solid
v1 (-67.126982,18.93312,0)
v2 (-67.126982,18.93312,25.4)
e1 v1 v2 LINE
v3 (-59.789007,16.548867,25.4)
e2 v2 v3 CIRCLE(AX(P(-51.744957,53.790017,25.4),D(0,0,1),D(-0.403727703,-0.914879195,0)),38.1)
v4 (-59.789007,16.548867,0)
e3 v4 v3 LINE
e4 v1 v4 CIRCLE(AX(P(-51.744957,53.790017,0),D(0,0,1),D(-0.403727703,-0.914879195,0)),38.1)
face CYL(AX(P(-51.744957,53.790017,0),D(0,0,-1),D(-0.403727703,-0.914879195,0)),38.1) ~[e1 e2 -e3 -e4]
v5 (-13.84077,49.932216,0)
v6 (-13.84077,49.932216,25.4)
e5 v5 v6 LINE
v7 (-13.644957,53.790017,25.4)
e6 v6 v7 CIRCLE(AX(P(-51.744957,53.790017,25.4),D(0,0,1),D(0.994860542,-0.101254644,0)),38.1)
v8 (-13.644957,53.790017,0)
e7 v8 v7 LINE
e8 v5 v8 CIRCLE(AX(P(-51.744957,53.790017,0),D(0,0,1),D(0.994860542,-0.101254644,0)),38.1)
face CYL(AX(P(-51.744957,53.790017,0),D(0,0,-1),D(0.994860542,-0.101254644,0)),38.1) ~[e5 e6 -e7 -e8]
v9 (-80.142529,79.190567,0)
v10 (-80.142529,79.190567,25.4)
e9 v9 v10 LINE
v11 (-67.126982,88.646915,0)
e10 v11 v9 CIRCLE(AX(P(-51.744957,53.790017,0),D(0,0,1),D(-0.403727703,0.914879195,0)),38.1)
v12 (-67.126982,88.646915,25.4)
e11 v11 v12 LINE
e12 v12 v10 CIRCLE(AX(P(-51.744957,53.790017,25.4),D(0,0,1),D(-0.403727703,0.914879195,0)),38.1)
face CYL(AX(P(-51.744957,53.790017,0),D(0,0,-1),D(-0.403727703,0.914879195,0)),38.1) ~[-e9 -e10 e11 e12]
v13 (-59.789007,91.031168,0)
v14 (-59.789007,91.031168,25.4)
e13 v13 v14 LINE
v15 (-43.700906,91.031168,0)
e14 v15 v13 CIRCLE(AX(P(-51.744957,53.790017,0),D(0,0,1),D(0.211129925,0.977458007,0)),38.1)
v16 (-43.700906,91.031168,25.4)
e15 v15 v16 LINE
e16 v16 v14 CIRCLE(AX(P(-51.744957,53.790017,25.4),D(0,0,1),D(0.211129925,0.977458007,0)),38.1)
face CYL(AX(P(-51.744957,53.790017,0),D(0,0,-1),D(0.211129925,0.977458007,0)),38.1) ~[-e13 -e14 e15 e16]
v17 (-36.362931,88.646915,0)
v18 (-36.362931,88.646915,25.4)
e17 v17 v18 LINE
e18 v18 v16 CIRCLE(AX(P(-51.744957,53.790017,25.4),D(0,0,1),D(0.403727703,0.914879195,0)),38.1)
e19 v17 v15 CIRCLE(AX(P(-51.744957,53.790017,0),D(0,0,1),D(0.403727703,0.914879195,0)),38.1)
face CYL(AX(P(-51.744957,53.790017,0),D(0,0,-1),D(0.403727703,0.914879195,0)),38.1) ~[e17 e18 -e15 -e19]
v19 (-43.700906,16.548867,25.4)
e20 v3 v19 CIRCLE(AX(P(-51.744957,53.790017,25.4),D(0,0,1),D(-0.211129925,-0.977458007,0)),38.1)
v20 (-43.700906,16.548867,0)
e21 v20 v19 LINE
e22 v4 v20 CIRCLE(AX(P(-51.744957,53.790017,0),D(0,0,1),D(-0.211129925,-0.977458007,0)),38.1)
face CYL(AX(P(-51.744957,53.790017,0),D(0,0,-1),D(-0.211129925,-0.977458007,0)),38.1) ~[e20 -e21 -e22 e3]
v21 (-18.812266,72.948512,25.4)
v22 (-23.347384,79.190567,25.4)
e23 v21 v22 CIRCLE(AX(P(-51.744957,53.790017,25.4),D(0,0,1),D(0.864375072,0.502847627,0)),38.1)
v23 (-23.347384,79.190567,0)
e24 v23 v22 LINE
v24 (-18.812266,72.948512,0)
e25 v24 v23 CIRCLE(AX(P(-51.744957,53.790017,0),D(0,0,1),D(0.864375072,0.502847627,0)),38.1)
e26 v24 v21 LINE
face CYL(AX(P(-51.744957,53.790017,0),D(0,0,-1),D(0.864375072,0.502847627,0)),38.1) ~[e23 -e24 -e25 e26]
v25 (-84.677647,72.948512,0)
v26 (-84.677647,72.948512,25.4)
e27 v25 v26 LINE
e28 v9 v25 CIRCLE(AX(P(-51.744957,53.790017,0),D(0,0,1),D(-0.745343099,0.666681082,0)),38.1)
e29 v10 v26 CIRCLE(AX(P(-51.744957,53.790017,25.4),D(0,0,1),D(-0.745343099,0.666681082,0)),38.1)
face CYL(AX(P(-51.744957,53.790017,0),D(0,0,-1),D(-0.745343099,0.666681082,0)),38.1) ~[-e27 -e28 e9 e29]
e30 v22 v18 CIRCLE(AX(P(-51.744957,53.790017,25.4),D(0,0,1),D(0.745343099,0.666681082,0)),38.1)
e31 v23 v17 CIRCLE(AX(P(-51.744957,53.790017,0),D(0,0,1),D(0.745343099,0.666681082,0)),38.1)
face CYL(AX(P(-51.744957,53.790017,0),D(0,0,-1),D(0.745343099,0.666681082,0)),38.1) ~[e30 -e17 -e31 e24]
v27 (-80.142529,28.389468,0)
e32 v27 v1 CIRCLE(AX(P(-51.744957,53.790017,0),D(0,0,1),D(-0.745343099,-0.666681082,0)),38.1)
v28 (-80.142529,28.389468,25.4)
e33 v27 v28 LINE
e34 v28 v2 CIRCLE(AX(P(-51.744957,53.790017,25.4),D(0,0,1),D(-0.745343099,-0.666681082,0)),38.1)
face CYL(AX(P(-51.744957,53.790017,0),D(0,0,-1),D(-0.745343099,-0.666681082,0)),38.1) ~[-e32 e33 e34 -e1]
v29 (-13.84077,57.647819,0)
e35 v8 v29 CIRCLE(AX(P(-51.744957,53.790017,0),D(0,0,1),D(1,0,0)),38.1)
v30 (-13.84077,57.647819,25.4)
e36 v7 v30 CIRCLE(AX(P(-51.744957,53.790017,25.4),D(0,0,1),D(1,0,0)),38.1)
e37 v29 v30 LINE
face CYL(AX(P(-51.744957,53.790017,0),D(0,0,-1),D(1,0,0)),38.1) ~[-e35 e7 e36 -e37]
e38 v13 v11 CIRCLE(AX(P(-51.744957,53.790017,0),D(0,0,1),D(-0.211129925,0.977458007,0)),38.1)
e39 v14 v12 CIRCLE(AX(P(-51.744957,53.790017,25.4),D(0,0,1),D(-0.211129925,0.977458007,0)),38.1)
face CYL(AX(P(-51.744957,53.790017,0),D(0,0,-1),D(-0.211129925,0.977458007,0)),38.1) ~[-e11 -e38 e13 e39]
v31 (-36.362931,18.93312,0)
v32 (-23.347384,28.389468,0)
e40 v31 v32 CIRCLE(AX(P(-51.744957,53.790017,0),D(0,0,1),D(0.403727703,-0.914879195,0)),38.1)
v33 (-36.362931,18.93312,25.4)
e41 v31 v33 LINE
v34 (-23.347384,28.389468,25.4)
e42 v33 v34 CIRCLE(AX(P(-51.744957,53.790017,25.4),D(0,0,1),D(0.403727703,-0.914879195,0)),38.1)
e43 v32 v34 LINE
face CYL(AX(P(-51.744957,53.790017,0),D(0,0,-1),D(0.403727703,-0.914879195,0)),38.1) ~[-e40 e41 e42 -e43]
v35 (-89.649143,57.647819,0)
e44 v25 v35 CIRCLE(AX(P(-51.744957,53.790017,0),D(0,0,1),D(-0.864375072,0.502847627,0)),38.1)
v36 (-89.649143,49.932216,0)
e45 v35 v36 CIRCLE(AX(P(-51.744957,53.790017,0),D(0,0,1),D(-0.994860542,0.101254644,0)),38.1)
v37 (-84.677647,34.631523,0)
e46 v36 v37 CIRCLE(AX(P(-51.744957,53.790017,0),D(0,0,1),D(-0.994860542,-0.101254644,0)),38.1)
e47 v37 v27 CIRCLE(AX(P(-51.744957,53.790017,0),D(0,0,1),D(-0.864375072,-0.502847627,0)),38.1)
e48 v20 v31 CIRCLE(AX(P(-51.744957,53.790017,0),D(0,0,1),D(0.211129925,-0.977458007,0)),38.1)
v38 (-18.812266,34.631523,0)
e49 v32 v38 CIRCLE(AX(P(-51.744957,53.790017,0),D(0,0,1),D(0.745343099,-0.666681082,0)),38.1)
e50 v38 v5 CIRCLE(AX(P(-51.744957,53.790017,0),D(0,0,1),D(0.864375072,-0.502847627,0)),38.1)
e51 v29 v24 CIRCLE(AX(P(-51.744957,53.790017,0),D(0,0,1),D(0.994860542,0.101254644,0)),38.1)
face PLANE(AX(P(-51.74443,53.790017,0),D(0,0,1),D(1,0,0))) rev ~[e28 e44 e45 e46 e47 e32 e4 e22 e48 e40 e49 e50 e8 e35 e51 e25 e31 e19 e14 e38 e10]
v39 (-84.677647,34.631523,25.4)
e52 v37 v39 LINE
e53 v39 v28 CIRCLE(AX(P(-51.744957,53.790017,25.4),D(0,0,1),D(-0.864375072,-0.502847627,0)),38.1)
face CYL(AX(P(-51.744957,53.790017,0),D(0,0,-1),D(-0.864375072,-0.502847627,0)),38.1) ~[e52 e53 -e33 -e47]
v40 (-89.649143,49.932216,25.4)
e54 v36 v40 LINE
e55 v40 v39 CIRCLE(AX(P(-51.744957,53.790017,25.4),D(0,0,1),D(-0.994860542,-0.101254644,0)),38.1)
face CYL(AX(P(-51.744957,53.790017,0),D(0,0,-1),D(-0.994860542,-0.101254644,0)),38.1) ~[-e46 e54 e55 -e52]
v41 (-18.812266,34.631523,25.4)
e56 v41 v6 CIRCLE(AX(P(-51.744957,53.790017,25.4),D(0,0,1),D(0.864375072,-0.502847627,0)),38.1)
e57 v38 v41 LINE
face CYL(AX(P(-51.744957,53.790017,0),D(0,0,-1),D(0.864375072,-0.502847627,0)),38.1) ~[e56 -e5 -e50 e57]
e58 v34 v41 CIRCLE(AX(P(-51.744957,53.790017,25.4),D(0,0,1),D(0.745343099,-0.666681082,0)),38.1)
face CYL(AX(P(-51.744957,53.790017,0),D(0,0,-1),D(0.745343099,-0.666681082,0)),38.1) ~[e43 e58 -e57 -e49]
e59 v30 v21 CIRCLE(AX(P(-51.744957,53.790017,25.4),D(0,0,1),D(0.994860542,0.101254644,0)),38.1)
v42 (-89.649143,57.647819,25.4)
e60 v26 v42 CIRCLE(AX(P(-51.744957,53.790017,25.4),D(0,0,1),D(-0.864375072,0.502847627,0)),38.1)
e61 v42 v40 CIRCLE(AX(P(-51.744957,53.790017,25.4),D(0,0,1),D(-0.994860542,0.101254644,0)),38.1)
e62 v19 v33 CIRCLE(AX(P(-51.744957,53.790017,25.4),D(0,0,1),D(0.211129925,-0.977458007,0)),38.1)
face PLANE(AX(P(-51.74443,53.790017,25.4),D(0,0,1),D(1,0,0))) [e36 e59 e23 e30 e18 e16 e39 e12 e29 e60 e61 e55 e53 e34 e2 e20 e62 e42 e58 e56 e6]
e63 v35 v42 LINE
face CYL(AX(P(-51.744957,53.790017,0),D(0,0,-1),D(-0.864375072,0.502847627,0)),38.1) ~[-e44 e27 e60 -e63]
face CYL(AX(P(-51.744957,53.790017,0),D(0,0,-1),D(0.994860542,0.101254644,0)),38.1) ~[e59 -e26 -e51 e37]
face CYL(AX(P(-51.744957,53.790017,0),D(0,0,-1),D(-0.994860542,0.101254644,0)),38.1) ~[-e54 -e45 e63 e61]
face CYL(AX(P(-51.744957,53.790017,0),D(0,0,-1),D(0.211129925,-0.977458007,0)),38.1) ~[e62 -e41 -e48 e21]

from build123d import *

# Parameters (mm, degrees)
F1_DEPTH = 25.4


# Not quite as in the source:
# - a feature names something its author has since deleted; it is built from what else it names


with BuildPart() as f1:
    # F0 (on Top) → F1 (new body)
    with BuildSketch(Plane.XY):
        with BuildLine():
            ThreePointArc((-13.8407698917, 49.932215552), (-13.693941355, 51.8586333583), (-13.6449565232, 53.7900174916))
            ThreePointArc((-13.6449565232, 53.7900174916), (-13.693941355, 55.7214016248), (-13.8407698917, 57.6478194312))
            ThreePointArc((-13.8407698917, 57.6478194312), (-15.5097032523, 65.5635649773), (-18.812266294, 72.9485120636))
            ThreePointArc((-18.812266294, 72.9485120636), (-20.9214090375, 76.1846356039), (-23.3473844667, 79.1905667238))
            ThreePointArc((-23.3473844667, 79.1905667238), (-29.3503384108, 84.6135649773), (-36.3629310228, 88.6469148221))
            ThreePointArc((-36.3629310228, 88.6469148221), (-39.9714090375, 90.0252707624), (-43.7009063693, 91.0311675426))
            ThreePointArc((-43.7009063693, 91.0311675426), (-51.7449565232, 91.8900174916), (-59.789006677, 91.0311675426))
            ThreePointArc((-59.789006677, 91.0311675426), (-63.5185040089, 90.0252707624), (-67.1269820235, 88.6469148221))
            ThreePointArc((-67.1269820235, 88.6469148221), (-74.1395746355, 84.6135649773), (-80.1425285796, 79.1905667238))
            ThreePointArc((-80.1425285796, 79.1905667238), (-82.5685040089, 76.1846356039), (-84.6776467524, 72.9485120636))
            ThreePointArc((-84.6776467524, 72.9485120636), (-87.980209794, 65.5635649773), (-89.6491431547, 57.6478194312))
            ThreePointArc((-89.6491431547, 57.6478194312), (-89.8449565232, 53.7900174916), (-89.6491431547, 49.932215552))
            ThreePointArc((-89.6491431547, 49.932215552), (-87.980209794, 42.0164700059), (-84.6776467524, 34.6315229195))
            ThreePointArc((-84.6776467524, 34.6315229195), (-82.5685040089, 31.3953993792), (-80.1425285796, 28.3894682594))
            ThreePointArc((-80.1425285796, 28.3894682594), (-74.1395746355, 22.9664700059), (-67.1269820235, 18.9331201611))
            ThreePointArc((-67.1269820235, 18.9331201611), (-63.5185040089, 17.5547642207), (-59.789006677, 16.5488674406))
            ThreePointArc((-59.789006677, 16.5488674406), (-51.7449565232, 15.6900174916), (-43.7009063693, 16.5488674406))
            ThreePointArc((-43.7009063693, 16.5488674406), (-39.9714090375, 17.5547642207), (-36.3629310228, 18.9331201611))
            ThreePointArc((-36.3629310228, 18.9331201611), (-29.3503384108, 22.9664700059), (-23.3473844667, 28.3894682594))
            ThreePointArc((-23.3473844667, 28.3894682594), (-20.9214090375, 31.3953993792), (-18.812266294, 34.6315229195))
            ThreePointArc((-18.812266294, 34.6315229195), (-15.5097032523, 42.0164700059), (-13.8407698917, 49.932215552))
        make_face()
    extrude(amount=F1_DEPTH)


solid = f1.part
